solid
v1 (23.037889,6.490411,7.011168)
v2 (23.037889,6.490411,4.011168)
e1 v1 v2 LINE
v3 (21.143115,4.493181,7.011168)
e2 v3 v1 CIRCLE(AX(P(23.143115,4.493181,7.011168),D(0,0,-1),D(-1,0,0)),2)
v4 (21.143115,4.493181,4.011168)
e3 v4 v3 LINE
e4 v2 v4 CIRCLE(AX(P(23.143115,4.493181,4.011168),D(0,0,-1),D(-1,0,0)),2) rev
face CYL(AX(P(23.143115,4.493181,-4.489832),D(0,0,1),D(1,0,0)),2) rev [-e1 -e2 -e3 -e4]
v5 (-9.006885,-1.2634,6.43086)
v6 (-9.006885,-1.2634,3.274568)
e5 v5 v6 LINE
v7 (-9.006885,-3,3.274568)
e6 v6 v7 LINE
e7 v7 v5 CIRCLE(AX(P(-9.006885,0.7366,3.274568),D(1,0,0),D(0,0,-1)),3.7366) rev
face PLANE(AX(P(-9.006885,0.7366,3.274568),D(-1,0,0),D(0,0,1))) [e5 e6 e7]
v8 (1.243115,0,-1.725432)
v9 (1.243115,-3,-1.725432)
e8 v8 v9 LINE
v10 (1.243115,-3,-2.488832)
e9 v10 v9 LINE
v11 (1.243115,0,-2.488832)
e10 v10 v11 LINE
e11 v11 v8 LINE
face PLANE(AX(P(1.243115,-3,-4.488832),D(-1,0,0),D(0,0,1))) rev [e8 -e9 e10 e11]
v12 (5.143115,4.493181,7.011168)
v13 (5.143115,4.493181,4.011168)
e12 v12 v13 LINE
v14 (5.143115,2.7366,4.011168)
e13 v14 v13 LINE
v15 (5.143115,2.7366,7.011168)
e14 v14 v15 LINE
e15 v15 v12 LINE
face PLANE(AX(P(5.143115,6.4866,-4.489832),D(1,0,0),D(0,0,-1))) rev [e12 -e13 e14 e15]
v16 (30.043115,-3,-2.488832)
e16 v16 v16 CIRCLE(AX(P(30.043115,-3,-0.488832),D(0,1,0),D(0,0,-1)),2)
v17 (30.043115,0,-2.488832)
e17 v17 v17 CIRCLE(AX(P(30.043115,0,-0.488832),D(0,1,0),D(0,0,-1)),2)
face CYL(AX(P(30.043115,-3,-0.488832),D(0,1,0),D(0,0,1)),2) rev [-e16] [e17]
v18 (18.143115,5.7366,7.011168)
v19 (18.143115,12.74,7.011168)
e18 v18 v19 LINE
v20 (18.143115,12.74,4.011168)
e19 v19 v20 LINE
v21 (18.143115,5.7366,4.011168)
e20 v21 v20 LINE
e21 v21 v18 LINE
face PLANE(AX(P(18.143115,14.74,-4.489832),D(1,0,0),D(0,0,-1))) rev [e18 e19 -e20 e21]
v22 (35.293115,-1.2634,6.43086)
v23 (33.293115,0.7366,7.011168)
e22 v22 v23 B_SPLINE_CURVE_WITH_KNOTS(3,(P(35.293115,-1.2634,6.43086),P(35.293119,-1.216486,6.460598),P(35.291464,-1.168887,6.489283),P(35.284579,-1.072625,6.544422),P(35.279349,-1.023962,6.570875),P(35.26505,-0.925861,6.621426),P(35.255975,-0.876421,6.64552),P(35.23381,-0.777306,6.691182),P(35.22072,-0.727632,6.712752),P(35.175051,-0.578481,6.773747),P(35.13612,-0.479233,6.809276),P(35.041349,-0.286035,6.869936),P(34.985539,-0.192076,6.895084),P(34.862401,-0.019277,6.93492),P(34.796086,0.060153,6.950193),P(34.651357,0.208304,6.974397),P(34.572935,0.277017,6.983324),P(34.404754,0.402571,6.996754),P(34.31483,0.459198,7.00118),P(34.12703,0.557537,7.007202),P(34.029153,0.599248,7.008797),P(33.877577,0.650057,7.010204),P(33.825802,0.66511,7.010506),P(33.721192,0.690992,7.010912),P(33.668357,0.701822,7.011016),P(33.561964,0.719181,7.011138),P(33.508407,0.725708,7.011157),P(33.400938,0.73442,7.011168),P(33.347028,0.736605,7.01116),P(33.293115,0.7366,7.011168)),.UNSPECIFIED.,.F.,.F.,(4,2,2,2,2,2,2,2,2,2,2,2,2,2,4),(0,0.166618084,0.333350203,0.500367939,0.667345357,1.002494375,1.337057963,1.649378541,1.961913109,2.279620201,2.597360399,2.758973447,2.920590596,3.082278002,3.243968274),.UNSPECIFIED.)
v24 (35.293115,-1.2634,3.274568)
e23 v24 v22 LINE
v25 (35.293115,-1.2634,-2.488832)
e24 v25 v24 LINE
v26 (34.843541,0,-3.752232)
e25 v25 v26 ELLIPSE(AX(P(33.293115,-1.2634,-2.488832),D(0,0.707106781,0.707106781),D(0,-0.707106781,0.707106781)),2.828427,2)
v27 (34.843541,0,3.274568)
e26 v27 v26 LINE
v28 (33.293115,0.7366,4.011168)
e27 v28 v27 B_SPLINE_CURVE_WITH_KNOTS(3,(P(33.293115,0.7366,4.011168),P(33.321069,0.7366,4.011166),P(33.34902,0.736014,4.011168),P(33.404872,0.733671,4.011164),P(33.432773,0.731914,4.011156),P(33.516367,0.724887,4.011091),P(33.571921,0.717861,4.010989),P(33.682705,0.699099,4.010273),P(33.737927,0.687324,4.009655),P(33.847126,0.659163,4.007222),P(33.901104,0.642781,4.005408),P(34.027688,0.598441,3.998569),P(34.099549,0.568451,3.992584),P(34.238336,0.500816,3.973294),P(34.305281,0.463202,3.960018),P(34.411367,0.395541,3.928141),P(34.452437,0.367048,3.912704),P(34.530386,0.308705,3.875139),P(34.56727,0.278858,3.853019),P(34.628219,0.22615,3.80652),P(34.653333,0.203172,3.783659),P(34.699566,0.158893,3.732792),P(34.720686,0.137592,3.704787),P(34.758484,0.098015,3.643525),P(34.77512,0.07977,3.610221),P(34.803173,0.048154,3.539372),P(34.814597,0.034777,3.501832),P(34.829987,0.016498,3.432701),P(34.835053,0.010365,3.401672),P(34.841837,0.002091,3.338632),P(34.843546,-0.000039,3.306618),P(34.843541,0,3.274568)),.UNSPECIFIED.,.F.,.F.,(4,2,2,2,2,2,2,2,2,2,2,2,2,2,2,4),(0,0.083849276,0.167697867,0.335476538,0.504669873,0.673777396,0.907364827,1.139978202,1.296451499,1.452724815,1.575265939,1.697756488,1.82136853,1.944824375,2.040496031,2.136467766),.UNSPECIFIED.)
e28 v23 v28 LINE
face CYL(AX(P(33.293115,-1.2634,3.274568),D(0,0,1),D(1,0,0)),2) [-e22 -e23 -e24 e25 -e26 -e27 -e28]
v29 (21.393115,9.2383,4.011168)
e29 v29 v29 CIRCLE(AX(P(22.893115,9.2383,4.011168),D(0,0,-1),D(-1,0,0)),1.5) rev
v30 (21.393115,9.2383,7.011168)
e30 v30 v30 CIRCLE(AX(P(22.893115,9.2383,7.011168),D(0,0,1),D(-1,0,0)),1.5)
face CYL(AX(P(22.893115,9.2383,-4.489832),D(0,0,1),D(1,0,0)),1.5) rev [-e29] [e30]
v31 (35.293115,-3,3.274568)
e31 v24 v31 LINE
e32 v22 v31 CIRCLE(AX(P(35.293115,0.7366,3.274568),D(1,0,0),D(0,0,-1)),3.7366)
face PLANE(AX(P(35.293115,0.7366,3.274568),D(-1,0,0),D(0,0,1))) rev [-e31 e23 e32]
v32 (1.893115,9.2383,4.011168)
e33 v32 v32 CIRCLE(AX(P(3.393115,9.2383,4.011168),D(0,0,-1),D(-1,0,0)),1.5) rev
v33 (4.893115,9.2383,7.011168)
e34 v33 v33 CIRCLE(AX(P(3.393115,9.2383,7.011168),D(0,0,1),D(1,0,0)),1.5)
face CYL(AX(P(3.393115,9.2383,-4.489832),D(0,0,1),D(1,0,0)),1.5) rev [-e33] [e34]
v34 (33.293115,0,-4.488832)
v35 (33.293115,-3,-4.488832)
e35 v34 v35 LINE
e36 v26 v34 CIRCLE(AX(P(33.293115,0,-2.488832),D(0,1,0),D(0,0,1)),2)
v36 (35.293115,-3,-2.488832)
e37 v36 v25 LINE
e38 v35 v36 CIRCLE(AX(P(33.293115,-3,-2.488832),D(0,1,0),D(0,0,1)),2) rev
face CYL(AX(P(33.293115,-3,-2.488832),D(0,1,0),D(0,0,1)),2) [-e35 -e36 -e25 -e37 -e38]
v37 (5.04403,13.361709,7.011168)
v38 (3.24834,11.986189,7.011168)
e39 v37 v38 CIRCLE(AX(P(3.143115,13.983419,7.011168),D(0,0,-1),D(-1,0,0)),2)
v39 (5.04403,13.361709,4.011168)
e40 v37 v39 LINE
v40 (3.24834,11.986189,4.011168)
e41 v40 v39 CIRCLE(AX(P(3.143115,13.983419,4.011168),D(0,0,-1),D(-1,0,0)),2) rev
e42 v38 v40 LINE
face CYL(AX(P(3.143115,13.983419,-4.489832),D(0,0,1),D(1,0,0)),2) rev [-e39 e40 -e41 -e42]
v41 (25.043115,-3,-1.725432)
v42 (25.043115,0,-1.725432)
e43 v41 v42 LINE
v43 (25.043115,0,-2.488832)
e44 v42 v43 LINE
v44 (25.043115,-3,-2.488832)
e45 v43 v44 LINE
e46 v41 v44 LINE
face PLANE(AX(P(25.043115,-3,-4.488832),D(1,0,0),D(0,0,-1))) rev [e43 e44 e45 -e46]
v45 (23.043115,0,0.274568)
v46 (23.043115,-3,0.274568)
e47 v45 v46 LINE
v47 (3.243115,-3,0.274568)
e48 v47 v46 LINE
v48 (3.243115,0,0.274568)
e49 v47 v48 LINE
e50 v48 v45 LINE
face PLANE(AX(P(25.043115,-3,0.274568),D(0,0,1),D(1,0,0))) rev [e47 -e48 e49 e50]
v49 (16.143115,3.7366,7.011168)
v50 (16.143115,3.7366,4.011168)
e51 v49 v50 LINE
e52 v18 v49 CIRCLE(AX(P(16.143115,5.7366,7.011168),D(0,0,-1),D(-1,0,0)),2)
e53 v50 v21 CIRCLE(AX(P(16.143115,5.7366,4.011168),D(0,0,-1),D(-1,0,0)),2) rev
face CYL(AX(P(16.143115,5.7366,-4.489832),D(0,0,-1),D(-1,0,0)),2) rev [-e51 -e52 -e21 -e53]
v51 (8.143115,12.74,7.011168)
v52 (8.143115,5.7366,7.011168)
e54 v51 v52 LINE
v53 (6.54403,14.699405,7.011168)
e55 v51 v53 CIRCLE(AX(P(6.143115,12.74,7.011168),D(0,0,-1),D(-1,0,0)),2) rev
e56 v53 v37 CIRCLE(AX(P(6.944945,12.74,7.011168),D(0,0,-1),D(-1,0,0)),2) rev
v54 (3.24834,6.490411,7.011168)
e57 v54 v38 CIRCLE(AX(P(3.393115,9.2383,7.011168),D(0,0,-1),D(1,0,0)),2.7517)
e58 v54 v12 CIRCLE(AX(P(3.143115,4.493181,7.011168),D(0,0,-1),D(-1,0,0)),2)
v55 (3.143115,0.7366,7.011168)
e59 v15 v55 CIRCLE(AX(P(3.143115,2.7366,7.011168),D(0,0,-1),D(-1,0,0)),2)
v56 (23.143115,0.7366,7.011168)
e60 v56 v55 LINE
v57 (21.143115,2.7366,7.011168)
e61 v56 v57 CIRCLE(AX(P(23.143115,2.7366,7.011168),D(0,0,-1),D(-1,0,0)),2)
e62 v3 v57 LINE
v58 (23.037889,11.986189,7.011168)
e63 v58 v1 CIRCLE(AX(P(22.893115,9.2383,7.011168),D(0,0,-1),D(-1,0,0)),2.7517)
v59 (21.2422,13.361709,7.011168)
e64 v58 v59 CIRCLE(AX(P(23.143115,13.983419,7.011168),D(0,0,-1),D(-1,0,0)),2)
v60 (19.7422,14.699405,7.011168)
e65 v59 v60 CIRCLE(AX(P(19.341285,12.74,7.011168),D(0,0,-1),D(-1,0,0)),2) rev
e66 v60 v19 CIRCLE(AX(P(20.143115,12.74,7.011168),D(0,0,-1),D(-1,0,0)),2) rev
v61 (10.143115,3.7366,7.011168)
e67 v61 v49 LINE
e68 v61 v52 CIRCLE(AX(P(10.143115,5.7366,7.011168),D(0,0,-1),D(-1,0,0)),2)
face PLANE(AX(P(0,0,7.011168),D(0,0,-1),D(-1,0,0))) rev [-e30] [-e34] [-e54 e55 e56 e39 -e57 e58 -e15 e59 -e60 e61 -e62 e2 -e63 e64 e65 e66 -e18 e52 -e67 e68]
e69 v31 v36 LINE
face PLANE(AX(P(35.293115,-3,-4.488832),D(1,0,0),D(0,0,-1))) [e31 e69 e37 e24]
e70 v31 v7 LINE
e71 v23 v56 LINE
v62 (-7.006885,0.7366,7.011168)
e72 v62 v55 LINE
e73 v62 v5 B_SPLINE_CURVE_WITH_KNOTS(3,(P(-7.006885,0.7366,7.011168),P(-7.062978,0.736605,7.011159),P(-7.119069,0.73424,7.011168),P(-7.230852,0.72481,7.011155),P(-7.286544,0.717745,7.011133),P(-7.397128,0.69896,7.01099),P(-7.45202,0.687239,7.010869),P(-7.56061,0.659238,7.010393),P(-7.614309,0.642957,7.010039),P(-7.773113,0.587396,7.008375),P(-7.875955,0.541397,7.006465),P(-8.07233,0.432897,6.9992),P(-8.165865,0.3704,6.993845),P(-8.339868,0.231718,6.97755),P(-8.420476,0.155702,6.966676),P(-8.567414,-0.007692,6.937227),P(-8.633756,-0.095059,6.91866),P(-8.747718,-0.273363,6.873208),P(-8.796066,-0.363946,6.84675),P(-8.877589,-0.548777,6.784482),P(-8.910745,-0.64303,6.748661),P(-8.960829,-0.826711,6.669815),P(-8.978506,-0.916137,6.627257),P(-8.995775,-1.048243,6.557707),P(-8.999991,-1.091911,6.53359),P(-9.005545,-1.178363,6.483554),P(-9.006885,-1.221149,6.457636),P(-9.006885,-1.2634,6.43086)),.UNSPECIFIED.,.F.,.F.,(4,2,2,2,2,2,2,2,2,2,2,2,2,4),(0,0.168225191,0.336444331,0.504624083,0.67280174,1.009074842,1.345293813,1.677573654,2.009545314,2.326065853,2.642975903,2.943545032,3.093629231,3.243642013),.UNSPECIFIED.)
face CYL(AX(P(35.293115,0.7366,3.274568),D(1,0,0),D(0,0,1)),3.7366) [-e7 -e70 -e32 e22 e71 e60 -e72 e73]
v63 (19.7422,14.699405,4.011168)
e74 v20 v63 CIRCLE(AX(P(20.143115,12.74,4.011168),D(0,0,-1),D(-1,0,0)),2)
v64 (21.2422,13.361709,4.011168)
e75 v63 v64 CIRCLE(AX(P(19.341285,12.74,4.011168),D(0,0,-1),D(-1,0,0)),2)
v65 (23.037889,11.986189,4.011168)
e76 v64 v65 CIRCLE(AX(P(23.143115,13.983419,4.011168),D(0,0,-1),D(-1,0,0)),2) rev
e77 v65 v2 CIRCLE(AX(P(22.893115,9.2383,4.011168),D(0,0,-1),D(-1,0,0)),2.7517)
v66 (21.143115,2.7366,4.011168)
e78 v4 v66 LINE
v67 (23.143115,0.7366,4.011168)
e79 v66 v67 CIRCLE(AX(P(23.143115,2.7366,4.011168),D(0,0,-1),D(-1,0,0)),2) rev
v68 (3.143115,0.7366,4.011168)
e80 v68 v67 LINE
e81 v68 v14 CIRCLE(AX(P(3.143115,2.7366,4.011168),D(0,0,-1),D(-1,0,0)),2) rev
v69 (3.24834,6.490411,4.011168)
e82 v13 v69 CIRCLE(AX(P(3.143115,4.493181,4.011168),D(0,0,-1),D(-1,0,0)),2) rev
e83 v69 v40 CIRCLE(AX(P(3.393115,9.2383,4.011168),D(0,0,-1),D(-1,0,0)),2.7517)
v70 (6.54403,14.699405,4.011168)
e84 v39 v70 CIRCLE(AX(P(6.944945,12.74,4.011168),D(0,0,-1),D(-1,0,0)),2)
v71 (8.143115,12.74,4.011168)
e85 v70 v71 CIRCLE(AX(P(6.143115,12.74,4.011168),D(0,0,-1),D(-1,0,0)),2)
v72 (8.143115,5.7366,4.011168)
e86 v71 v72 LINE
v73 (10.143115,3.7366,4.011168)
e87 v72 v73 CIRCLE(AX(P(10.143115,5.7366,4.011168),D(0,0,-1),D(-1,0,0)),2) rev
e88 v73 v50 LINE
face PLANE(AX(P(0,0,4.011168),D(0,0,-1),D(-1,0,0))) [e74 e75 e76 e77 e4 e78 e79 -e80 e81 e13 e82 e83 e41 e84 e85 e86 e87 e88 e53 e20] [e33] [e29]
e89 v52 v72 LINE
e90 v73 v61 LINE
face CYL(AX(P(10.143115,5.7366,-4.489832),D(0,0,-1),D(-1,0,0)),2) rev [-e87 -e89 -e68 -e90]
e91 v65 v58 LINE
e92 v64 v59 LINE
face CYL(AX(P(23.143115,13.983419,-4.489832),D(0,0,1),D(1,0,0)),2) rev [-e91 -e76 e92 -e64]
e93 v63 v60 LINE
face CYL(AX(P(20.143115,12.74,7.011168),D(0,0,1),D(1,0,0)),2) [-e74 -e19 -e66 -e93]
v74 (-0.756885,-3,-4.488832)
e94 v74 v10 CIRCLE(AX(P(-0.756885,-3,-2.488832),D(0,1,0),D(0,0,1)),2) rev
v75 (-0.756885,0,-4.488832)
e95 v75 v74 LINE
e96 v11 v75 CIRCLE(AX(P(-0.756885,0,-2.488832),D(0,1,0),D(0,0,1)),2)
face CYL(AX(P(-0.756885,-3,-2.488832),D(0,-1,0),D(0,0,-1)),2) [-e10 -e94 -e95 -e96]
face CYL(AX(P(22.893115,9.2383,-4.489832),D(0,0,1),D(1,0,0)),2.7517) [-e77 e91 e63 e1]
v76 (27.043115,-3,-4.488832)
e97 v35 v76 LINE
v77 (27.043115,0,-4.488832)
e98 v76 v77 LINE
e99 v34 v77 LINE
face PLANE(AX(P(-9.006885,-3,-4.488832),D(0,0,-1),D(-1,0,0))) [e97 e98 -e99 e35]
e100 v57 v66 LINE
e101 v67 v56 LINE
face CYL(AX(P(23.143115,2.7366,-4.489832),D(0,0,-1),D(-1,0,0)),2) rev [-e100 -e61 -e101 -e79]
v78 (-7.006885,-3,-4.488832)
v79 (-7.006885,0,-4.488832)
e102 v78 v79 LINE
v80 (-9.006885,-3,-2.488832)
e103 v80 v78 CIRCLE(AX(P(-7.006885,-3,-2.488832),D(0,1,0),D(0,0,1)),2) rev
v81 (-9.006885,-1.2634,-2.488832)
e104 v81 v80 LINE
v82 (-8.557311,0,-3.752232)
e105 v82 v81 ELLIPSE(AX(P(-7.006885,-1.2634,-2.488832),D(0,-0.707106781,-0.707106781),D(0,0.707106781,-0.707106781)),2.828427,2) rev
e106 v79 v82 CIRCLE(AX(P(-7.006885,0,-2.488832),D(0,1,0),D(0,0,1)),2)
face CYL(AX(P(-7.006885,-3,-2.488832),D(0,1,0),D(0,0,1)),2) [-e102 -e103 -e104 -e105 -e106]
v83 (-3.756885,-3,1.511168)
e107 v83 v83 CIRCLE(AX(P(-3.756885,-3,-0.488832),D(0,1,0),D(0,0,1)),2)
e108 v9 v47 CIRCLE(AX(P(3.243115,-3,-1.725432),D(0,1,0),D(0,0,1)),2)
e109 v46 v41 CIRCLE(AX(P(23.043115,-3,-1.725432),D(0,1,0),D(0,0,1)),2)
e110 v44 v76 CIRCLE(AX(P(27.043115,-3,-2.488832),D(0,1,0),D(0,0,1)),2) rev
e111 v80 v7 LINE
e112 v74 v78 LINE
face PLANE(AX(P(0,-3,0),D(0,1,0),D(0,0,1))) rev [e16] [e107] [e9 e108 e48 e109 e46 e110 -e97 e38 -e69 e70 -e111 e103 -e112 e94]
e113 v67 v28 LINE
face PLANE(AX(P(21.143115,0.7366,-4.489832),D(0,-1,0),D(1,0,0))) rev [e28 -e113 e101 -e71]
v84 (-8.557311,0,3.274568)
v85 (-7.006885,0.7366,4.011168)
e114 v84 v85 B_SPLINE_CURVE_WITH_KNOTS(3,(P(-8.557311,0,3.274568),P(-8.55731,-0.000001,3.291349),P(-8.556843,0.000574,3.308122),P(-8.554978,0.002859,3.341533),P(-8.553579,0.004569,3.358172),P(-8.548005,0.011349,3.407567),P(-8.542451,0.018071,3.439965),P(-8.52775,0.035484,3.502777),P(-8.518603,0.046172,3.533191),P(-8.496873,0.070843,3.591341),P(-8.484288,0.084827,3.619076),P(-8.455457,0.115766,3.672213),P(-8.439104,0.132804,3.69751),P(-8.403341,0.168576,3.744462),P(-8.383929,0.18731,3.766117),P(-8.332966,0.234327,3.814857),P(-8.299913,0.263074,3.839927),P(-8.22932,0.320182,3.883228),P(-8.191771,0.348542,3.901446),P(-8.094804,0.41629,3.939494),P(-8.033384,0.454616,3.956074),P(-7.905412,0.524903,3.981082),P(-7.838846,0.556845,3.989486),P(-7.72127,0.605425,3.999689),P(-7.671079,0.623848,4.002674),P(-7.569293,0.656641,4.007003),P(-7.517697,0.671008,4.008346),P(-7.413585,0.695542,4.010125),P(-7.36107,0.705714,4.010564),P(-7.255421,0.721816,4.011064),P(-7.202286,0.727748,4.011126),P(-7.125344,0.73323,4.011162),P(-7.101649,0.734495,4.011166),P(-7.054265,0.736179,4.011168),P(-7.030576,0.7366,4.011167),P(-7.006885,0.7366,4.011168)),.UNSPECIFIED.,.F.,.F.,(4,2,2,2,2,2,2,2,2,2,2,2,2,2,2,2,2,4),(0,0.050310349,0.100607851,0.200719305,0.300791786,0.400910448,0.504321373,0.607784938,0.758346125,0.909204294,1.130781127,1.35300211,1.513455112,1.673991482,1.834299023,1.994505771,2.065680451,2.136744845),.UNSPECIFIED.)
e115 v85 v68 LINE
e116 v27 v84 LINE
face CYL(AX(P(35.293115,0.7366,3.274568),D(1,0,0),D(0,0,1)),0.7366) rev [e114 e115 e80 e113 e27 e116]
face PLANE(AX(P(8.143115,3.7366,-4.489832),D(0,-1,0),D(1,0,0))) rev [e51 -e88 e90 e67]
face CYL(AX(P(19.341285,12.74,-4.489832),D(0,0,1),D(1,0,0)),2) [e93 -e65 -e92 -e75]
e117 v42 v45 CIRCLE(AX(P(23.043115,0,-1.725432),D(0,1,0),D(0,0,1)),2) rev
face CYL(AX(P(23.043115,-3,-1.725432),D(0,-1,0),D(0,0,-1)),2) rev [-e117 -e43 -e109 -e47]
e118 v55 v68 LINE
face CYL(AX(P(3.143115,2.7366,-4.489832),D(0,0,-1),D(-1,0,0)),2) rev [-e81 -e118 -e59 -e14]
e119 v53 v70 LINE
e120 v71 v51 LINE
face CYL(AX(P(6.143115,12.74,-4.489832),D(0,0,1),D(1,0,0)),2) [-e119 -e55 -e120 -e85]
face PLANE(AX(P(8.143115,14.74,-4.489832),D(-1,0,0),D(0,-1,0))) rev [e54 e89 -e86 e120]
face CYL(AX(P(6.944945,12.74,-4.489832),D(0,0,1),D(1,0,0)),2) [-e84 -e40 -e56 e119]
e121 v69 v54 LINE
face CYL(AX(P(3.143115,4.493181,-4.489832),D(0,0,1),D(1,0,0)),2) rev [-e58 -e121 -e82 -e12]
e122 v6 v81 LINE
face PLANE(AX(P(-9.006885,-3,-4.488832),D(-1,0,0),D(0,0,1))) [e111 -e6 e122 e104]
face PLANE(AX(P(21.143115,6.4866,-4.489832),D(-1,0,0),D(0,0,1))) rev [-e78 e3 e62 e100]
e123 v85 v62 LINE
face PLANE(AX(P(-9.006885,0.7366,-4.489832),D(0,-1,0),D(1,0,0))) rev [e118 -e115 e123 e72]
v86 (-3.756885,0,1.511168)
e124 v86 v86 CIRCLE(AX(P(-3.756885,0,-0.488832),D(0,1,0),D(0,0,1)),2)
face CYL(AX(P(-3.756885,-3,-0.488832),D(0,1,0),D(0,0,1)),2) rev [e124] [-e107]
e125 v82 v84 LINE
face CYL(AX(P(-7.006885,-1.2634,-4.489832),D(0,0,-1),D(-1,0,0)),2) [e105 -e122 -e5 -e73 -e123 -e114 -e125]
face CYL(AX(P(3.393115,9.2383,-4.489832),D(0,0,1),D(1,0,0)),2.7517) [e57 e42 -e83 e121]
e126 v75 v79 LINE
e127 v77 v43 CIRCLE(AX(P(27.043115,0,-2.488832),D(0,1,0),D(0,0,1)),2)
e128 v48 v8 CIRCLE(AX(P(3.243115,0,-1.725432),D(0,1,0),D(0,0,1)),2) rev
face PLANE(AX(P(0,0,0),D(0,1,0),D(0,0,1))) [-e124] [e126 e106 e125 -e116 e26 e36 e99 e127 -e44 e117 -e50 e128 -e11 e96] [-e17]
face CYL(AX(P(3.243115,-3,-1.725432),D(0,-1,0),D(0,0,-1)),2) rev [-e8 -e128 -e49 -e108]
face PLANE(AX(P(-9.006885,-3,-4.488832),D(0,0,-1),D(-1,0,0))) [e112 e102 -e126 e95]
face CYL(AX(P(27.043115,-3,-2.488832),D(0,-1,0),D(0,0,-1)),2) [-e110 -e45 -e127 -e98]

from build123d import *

# Parameters (mm, degrees)
ESBO_O23_W                     = 44.3
ESBO_O23_H                     = 11.5
ESBO_O23_R                     = 2
FLANGE_BASE2_DEPTH             = 3
ARESTA_FLANGE1_STRIP_W         = 13.4732
ARESTA_FLANGE1_STRIP_H         = 3
ARESTA_FLANGE1_STRIP_CUT_DEPTH = 44.3
ARESTA_FLANGE1_DEPTH           = 44.3
CORTE_EXTRUS_O1_REACH          = 41.939
CORTE_EXTRUS_O2_REACH          = 41.939
ESBO_O33_R                     = 1.5
ESBO_O33_W                     = 10
ESBO_O33_H                     = 11.0034
FILETE1_START                  = -5
FILETE1_DEPTH                  = 12.011168151
FILETE1_START_2                = 4.011168151
FILETE1_2_DEPTH                = 3
FILETE1_3_DEPTH                = 3
FILETE1_START_3                = -4
FILETE1_4_DEPTH                = 4.7366001
ESBO_O34_W                     = 23.8
ESBO_O34_H                     = 4.7634
CORTE_EXTRUS_O3_DEPTH          = 39.884804768
FILETE2_R                      = 2


with BuildPart() as part:
    # Flange-base2: sheet metal written as solids
    # Esboço23 → Flange-base2 (new body)
    with BuildSketch(Plane(origin=(0, 0, 0), x_dir=(1, 0, 0), z_dir=(0, 1, 0))):
        with Locations((13.143114832, -1.261168151)):
            Rectangle(ESBO_O23_W, ESBO_O23_H)
        with Locations(Location((-3.756885168, 0.488831849, 0), (0, 0, 270))):
            Circle(ESBO_O23_R, mode=Mode.SUBTRACT)
        with Locations(Location((30.043114832, 0.488831849, 0), (0, 0, 90))):
            Circle(ESBO_O23_R, mode=Mode.SUBTRACT)
    extrude(amount=-FLANGE_BASE2_DEPTH)

    # Aresta-Flange1: sheet metal written as solids
    # Aresta-Flange1 strip (on a plane across the edge) → Aresta-Flange1 strip cut (cut)
    with BuildSketch(Plane(origin=(-9.006885168, 0, 7.011168151), x_dir=(0, 0, -1), z_dir=(1, 0, 0))):
        with Locations((-3, -1.5)):
            Rectangle(ARESTA_FLANGE1_STRIP_W, ARESTA_FLANGE1_STRIP_H)
    extrude(amount=ARESTA_FLANGE1_STRIP_CUT_DEPTH, mode=Mode.SUBTRACT)

    # Aresta-Flange1 section (on a plane across the edge) → Aresta-Flange1 (add)
    with BuildSketch(Plane(origin=(-9.006885168, 0, 7.011168151), x_dir=(0, 0, -1), z_dir=(1, 0, 0))):
        with BuildLine():
            Line((0, 0.7366), (0, 14.74))
            Line((0, 14.74), (3, 14.74))
            Line((3, 14.74), (3, 0.7366))
            ThreePointArc((3, 0.7366), (3.215745145, 0.215745145), (3.7366, 0))
            Line((3.7366, 0), (3.7366, -3))
            ThreePointArc((3.7366, -3), (1.094424801, -1.905575199), (0, 0.7366))
        make_face()
    extrude(amount=ARESTA_FLANGE1_DEPTH)

    # Esboço31 → Corte-extrusão1 (cut, up to next)
    with BuildSketch(Plane.XY.offset(7.011168151), mode=Mode.PRIVATE) as corte_extrus_o1_sk1:
        with BuildLine():
            Line((5.143114832, 14.74), (5.143114832, 11.99))
            Line((5.143114832, 11.99), (3.393114832, 11.99))
            ThreePointArc((3.393114832, 11.99), (0.641414832, 9.2383), (3.393114832, 6.4866))
            Line((3.393114832, 6.4866), (5.143114832, 6.4866))
            Line((5.143114832, 6.4866), (5.143114832, 0.7366))
            Line((5.143114832, 0.7366), (-9.006885168, 0.7366))
            Line((-9.006885168, 0.7366), (-9.006885168, 14.74))
            Line((-9.006885168, 14.74), (5.143114832, 14.74))
        make_face()
    corte_extrus_o1_tool1 = extrude(corte_extrus_o1_sk1.sketch, amount=-CORTE_EXTRUS_O1_REACH, mode=Mode.PRIVATE) & part.part
    # Esboço31 → Corte-extrusão1 (cut, up to next)
    with BuildSketch(Plane.XY.offset(7.011168151), mode=Mode.PRIVATE) as corte_extrus_o1_sk2:
        with BuildLine():
            Line((21.143114832, 6.4866), (21.143114832, 0.7366))
            Line((21.143114832, 0.7366), (35.293114832, 0.7366))
            Line((35.293114832, 0.7366), (35.293114832, 14.74))
            Line((35.293114832, 14.74), (21.143114832, 14.74))
            Line((21.143114832, 14.74), (21.143114832, 11.99))
            Line((21.143114832, 11.99), (22.893114832, 11.99))
            ThreePointArc((22.893114832, 11.99), (25.644814832, 9.2383), (22.893114832, 6.4866))
            Line((22.893114832, 6.4866), (21.143114832, 6.4866))
        make_face()
    corte_extrus_o1_tool2 = extrude(corte_extrus_o1_sk2.sketch, amount=-CORTE_EXTRUS_O1_REACH, mode=Mode.PRIVATE) & part.part
    add(corte_extrus_o1_tool1.solids().sort_by_distance((-2.549902, 7.555498, 7.011168))[0], mode=Mode.SUBTRACT)
    add(corte_extrus_o1_tool2.solids().sort_by_distance((28.836132, 7.555498, 7.011168))[0], mode=Mode.SUBTRACT)

    # Esboço33 → Corte-extrusão2 (cut, up to next)
    with BuildSketch(Plane.XY.offset(7.011168151), mode=Mode.PRIVATE) as corte_extrus_o2_sk1:
        with Locations((3.393114832, 9.2383)):
            Circle(ESBO_O33_R)
    corte_extrus_o2_tool1 = extrude(corte_extrus_o2_sk1.sketch, amount=-CORTE_EXTRUS_O2_REACH, mode=Mode.PRIVATE) & part.part
    # Esboço33 → Corte-extrusão2 (cut, up to next)
    with BuildSketch(Plane.XY.offset(7.011168151), mode=Mode.PRIVATE) as corte_extrus_o2_sk2:
        with Locations(Location((22.893114832, 9.2383, 0), (0, 0, 180))):
            Circle(ESBO_O33_R)
    corte_extrus_o2_tool2 = extrude(corte_extrus_o2_sk2.sketch, amount=-CORTE_EXTRUS_O2_REACH, mode=Mode.PRIVATE) & part.part
    # Esboço33 → Corte-extrusão2 (cut, up to next)
    with BuildSketch(Plane.XY.offset(7.011168151), mode=Mode.PRIVATE) as corte_extrus_o2_sk3:
        with Locations((13.143114832, 9.2383)):
            Rectangle(ESBO_O33_W, ESBO_O33_H)
    corte_extrus_o2_tool3 = extrude(corte_extrus_o2_sk3.sketch, amount=-CORTE_EXTRUS_O2_REACH, mode=Mode.PRIVATE) & part.part
    add(corte_extrus_o2_tool1.solids().sort_by_distance((3.393115, 9.2383, 7.011168))[0], mode=Mode.SUBTRACT)
    add(corte_extrus_o2_tool2.solids().sort_by_distance((22.893115, 9.2383, 7.011168))[0], mode=Mode.SUBTRACT)
    add(corte_extrus_o2_tool3.solids().sort_by_distance((13.143115, 9.2383, 7.011168))[0], mode=Mode.SUBTRACT)

    # Filete1: read off the stored shape, not the designer's step
    # Filete1 outline → Filete1 (cut)
    with BuildSketch(Plane.XY.offset(FILETE1_START)):
        with BuildLine():
            Line((-9.006885168, 0.7366), (-9.006885168, -1.2634))
            ThreePointArc((-9.006885168, -1.2634), (-8.42109873, 0.150813562), (-7.006885168, 0.7366))
            Line((-7.006885168, 0.7366), (-9.006885168, 0.7366))
        make_face()
        with BuildLine():
            ThreePointArc((33.293114832, 0.7366), (34.707328395, 0.150813562), (35.293114832, -1.2634))
            Line((35.293114832, -1.2634), (35.293114832, 0.7366))
            Line((35.293114832, 0.7366), (33.293114832, 0.7366))
        make_face()
    extrude(amount=FILETE1_DEPTH, mode=Mode.SUBTRACT)

    # Filete1 2 outline → Filete1 2 (add)
    with BuildSketch(Plane.XY.offset(FILETE1_START_2)):
        with BuildLine():
            ThreePointArc((5.143114832, 2.7366), (4.557328394, 1.322386438), (3.143114832, 0.7366))
            Line((3.143114832, 0.7366), (5.143114832, 0.7366))
            Line((5.143114832, 0.7366), (5.143114832, 2.7366))
        make_face()
        with BuildLine():
            Line((21.143114832, 0.7366), (23.143114832, 0.7366))
            ThreePointArc((23.143114832, 0.7366), (21.72890127, 1.322386438), (21.143114832, 2.7366))
            Line((21.143114832, 2.7366), (21.143114832, 0.7366))
        make_face()
        with BuildLine():
            Line((8.143114832, 3.7366), (10.143114832, 3.7366))
            ThreePointArc((10.143114832, 3.7366), (8.72890127, 4.322386438), (8.143114832, 5.7366))
            Line((8.143114832, 5.7366), (8.143114832, 3.7366))
        make_face()
        with BuildLine():
            ThreePointArc((18.143114832, 5.7366), (17.557328394, 4.322386437), (16.143114832, 3.7366))
            Line((16.143114832, 3.7366), (18.143114832, 3.7366))
            Line((18.143114832, 3.7366), (18.143114832, 5.7366))
        make_face()
    extrude(amount=FILETE1_2_DEPTH)

    # Filete1 3 outline → Filete1 3 (add)
    with BuildSketch(Plane.XY.offset(FILETE1_START_2)):
        with BuildLine():
            ThreePointArc((22.893114832, 11.99), (22.96552716, 11.989047052), (23.037889334, 11.986188868))
            ThreePointArc((23.037889334, 11.986188868), (21.69217531, 12.606910766), (21.143114832, 13.983418849))
            Line((21.143114832, 13.983418849), (21.143114832, 11.99))
            Line((21.143114832, 11.99), (22.893114832, 11.99))
        make_face()
        with BuildLine():
            ThreePointArc((21.143114832, 4.493181151), (21.69217531, 5.869689234), (23.037889334, 6.490411131))
            ThreePointArc((23.037889334, 6.490411131), (22.96552716, 6.487552948), (22.893114832, 6.4866))
            Line((22.893114832, 6.4866), (21.143114832, 6.4866))
            Line((21.143114832, 6.4866), (21.143114832, 4.493181151))
        make_face()
        with BuildLine():
            ThreePointArc((5.143114832, 13.983418849), (4.594054355, 12.606910766), (3.248340331, 11.986188869))
            ThreePointArc((3.248340331, 11.986188869), (3.320702504, 11.989047052), (3.393114832, 11.99))
            Line((3.393114832, 11.99), (5.143114832, 11.99))
            Line((5.143114832, 11.99), (5.143114832, 13.983418849))
        make_face()
        with BuildLine():
            ThreePointArc((3.248340331, 6.490411131), (4.594054355, 5.869689234), (5.143114832, 4.493181151))
            Line((5.143114832, 4.493181151), (5.143114832, 6.4866))
            Line((5.143114832, 6.4866), (3.393114832, 6.4866))
            ThreePointArc((3.393114832, 6.4866), (3.320702504, 6.487552948), (3.248340331, 6.490411131))
        make_face()
    extrude(amount=FILETE1_3_DEPTH)

    # Filete1 4 outline → Filete1 4 (cut)
    with BuildSketch(Plane(origin=(0, 0, 0), x_dir=(1, 0, 0), z_dir=(0, 1, 0)).offset(FILETE1_START_3)):
        with BuildLine():
            Line((35.293114832, 4.488831849), (33.293114832, 4.488831849))
            ThreePointArc((33.293114832, 4.488831849), (34.707328395, 3.903045412), (35.293114832, 2.488831849))
            Line((35.293114832, 2.488831849), (35.293114832, 4.488831849))
        make_face()
        with BuildLine():
            ThreePointArc((-9.006885168, 2.488831849), (-8.421098731, 3.903045412), (-7.006885168, 4.488831849))
            Line((-7.006885168, 4.488831849), (-9.006885168, 4.488831849))
            Line((-9.006885168, 4.488831849), (-9.006885168, 2.488831849))
        make_face()
    extrude(amount=FILETE1_4_DEPTH, mode=Mode.SUBTRACT)

    # Esboço34 → Corte-extrusão3 (cut, through all)
    with BuildSketch(Plane(origin=(0, 0, 0), x_dir=(1, 0, 0), z_dir=(0, 1, 0))):
        with Locations((13.143114832, 2.107131849)):
            Rectangle(ESBO_O34_W, ESBO_O34_H)
    extrude(amount=-CORTE_EXTRUS_O3_DEPTH, mode=Mode.SUBTRACT)

    # Filete2
    # the kernel refuses this fillet: 2 mm, written as the material it adds along each edge
    with BuildSketch(Plane(origin=(1.243114832, 0, 0.274568151), x_dir=(0, 0, -1), z_dir=(0, -1, 0))) as filete2_piece_1:
        with BuildLine():
            CenterArc((FILETE2_R, FILETE2_R), FILETE2_R, 180, 90)
            Line((0, FILETE2_R), (0, 0))
            Line((0, 0), (FILETE2_R, 0))
        make_face()
    extrude(amount=3)
    with BuildSketch(Plane(origin=(25.043114832, 0, 0.274568151), x_dir=(0, 0, -1), z_dir=(0, -1, 0))) as filete2_piece_2:
        with BuildLine():
            CenterArc((FILETE2_R, -FILETE2_R), FILETE2_R, 90, 90)
            Line((0, -FILETE2_R), (0, 0))
            Line((0, 0), (FILETE2_R, 0))
        make_face()
    extrude(amount=3)
    # the kernel refuses this fillet: 2 mm, written as the material it takes off along each edge
    with BuildSketch(Plane(origin=(5.143114832, 14.74, 11.515742565), x_dir=(1, 0, 0), z_dir=(0, 0, -1))) as filete2_2_piece_1:
        with BuildLine():
            CenterArc((1.801829766, 2), FILETE2_R, 198.110746947, 71.889253053)
            Line((-0.099085117, 1.378290576), (-0.289176606, 1.316119634))
            ThreePointArc((-0.289176606, 1.316119634), (-0.2, 0.756581151), (-0.2, 0))
            Line((-0.2, 0), (0, -0.2))
            Line((0, -0.2), (1.801829766, -0.2))
            Line((1.801829766, -0.2), (1.801829766, 0))
        make_face()
    extrude(amount=12.009148828, mode=Mode.SUBTRACT)
    with BuildSketch(Plane(origin=(21.143114832, 14.74, 11.515742565), x_dir=(0.07170480855584176, -0.9974258972124044, 0), z_dir=(0, 0, -1))) as filete2_2_piece_2:
        with BuildLine():
            CenterArc((1.865651936, 1.940601288), FILETE2_R, 184.111911668, 71.889253032)
            Line((-0.129199858, 1.797191671), (-0.328685038, 1.782850709))
            Line((-0.328685038, 1.782850709), (-0.199485179, -0.014340962))
            Line((-0.199485179, -0.014340962), (0.014340962, -0.199485179))
            ThreePointArc((0.014340962, -0.199485179), (0.768974595, -0.145234673), (1.333467159, -0.194060129))
            Line((1.333467159, -0.194060129), (1.381847593, 0))
        make_face()
    extrude(amount=12.009148828, mode=Mode.SUBTRACT)
    with BuildSketch(Plane(origin=(8.143114832, 14.74, 12.011168151), x_dir=(0, -1, 0), z_dir=(0, 0, -1)), Plane(origin=(18.143114832, 14.74, 12.011168151), x_dir=(1, 0, 0), z_dir=(0, 0, -1)), Plane(origin=(25.043114832, 5, -4.488831849), x_dir=(1, 0, 0), z_dir=(0, -1, 0))) as filete2_2_piece_3:
        with BuildLine():
            CenterArc((FILETE2_R, FILETE2_R), FILETE2_R, 180, 90)
            Line((0, FILETE2_R), (0, 0))
            Line((0, 0), (FILETE2_R, 0))
        make_face()
    extrude(amount=13, mode=Mode.SUBTRACT)
    with BuildSketch(Plane(origin=(1.243114832, 5, -4.488831849), x_dir=(-1, 0, 0), z_dir=(0, -1, 0))) as filete2_2_piece_4:
        with BuildLine():
            CenterArc((FILETE2_R, -FILETE2_R), FILETE2_R, 90, 90)
            Line((0, -FILETE2_R), (0, 0))
            Line((0, 0), (FILETE2_R, 0))
        make_face()
    extrude(amount=13, mode=Mode.SUBTRACT)


solid = part.part
